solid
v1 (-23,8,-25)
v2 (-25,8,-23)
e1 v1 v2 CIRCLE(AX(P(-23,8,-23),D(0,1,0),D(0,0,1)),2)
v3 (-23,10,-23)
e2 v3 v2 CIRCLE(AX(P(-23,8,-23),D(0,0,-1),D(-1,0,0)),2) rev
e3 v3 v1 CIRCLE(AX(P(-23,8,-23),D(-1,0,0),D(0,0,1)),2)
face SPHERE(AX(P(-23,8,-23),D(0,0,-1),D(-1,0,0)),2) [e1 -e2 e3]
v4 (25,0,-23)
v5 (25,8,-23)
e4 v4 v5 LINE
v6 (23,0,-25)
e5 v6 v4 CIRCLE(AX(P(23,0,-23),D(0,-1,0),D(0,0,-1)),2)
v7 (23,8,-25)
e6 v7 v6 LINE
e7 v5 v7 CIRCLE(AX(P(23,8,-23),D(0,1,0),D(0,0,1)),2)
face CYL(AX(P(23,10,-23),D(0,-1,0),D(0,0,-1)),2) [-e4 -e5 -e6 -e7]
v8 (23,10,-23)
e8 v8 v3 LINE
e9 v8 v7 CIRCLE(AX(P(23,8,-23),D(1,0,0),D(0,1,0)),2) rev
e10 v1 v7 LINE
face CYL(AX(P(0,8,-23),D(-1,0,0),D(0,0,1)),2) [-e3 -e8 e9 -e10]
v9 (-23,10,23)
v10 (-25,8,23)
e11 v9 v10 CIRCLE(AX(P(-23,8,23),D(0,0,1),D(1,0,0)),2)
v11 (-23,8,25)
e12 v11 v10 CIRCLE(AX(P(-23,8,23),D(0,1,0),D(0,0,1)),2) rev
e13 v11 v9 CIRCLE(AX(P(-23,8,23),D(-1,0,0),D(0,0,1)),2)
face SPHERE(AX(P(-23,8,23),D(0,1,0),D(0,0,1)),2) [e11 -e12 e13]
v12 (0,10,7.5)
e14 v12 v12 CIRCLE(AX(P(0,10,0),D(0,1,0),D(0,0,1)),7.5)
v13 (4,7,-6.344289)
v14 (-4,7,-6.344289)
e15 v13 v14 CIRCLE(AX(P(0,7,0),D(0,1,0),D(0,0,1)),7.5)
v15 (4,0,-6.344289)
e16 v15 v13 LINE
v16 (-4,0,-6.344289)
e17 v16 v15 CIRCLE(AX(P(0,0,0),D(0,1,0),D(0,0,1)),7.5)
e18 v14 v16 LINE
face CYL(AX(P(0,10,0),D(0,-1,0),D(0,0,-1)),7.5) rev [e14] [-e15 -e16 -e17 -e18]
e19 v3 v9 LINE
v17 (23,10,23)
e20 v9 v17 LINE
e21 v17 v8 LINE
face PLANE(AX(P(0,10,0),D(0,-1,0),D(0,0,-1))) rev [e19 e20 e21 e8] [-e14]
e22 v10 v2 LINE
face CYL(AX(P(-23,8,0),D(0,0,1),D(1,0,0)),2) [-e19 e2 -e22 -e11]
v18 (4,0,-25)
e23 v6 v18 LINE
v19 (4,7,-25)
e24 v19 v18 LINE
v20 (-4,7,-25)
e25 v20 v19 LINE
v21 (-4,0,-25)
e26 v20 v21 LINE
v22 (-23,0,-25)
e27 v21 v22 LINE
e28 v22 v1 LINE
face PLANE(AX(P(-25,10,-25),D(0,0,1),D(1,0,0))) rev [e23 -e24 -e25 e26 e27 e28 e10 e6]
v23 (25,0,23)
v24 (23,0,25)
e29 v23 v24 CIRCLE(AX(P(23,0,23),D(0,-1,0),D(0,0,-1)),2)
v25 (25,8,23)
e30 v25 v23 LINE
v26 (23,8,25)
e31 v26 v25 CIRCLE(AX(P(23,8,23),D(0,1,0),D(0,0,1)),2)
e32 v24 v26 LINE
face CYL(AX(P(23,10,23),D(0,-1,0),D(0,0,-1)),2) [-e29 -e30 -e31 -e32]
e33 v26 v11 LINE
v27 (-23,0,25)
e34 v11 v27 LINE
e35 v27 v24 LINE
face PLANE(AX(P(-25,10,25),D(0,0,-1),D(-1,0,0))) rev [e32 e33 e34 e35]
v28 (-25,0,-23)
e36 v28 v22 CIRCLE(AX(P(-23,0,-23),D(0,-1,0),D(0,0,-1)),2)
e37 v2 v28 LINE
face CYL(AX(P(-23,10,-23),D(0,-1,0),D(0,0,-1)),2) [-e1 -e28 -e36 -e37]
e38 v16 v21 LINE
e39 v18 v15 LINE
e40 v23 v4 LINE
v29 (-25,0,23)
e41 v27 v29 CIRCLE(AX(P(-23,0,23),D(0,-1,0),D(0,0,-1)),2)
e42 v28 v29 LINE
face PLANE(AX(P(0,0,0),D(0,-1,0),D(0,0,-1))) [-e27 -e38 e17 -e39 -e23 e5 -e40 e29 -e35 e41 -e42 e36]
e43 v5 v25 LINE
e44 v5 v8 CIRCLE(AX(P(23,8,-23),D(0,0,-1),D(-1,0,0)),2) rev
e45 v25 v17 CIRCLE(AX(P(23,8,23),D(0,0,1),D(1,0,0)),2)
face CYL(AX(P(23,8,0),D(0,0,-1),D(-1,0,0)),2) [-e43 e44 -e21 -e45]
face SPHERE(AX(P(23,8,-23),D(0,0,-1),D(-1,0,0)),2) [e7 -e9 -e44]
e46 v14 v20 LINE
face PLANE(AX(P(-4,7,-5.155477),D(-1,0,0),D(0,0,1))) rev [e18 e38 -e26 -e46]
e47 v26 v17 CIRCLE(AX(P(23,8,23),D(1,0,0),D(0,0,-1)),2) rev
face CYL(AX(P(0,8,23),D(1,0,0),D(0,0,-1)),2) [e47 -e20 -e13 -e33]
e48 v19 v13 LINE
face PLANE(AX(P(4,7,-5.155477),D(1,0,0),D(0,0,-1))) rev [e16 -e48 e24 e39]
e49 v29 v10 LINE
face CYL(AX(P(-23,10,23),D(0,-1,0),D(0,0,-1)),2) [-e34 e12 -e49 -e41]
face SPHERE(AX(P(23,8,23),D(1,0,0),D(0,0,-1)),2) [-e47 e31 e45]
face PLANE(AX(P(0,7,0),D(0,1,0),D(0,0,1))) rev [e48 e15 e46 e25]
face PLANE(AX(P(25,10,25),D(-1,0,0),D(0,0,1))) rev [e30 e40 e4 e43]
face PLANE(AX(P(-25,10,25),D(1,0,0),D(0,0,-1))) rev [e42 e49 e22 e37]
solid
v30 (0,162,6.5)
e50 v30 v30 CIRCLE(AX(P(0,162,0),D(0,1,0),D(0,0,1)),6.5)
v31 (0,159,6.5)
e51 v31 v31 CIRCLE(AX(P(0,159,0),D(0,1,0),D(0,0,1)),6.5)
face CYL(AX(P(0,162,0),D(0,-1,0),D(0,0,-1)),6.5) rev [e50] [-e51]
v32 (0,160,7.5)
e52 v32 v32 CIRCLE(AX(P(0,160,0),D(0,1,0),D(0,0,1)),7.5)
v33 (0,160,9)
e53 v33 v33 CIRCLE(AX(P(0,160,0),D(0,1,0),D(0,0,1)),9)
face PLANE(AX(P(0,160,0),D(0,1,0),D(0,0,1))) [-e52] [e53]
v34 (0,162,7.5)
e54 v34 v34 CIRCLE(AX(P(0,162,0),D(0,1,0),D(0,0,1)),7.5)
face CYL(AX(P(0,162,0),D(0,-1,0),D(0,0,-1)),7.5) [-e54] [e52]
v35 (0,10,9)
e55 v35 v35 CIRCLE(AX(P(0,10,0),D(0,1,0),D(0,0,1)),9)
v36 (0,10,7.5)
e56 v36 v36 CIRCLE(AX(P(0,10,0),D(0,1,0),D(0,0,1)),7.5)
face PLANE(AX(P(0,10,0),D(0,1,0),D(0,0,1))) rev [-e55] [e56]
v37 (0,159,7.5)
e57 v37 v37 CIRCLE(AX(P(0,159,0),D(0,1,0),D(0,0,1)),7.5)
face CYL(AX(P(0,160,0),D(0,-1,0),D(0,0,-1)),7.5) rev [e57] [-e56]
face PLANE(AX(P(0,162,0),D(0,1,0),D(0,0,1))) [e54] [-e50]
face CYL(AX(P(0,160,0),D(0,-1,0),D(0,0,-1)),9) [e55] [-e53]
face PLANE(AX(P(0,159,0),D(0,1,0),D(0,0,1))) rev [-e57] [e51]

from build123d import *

# Parameters (mm, degrees)
SKETCH_220_W        = 50
SKETCH_220_H        = 50
SKETCH_220_R        = 7.5
EXTRUDE_1_DEPTH     = 10
FILLET_2_R          = 2
SKETCH_983_R        = 9
EXTRUDE_2_DEPTH     = 150
SHELL_6_T           = -1.5
SKETCH_6_R          = 7.5
EXTRUDE_5_DEPTH     = 3
SHELL_START         = 159
SHELL_13_OUTLINE_R  = 6.5
SHELL_13_DEPTH      = 3
SKETCH_9_W          = 8
SKETCH_9_H          = 19.844522728
CUT_EXTRUDE_1_DEPTH = 7


# Read off the part's stored shape, not the designer's step: 抽壳13
with BuildPart() as part:
    # Sketch 220 → 凸台-拉伸1 (new body)
    with BuildSketch(Plane(origin=(0, 0, 0), x_dir=(1, 0, 0), z_dir=(0, 1, 0))):
        Rectangle(SKETCH_220_W, SKETCH_220_H)
        with Locations(Location((0, 0, 0), (0, 0, 270))):
            Circle(SKETCH_220_R, mode=Mode.SUBTRACT)
    extrude(amount=EXTRUDE_1_DEPTH)

    # 圆角2
    fillet_2_edges = [part.edges().sort_by_distance(p)[0] for p in [
        (-25, 10, 0),
        (0, 10, 25),
        (25, 10, 0),
        (25, 5, 25),
        (-25, 5, 25),
        (-25, 5, -25),
        (25, 5, -25),
        (0, 10, -25),
    ]]
    fillet(fillet_2_edges, radius=FILLET_2_R)

    # 草图9 → 切除-拉伸1 (cut)
    with BuildSketch(Plane(origin=(0, 0, 0), x_dir=(-1, 0, 0), z_dir=(0, -1, 0))):
        with Locations((0, 15.077738636)):
            Rectangle(SKETCH_9_W, SKETCH_9_H)
    extrude(amount=-CUT_EXTRUDE_1_DEPTH, mode=Mode.SUBTRACT)


with BuildPart() as body_2:
    # Sketch 983 → 凸台-拉伸2 (new body)
    with BuildSketch(Plane(origin=(0, 10, 0), x_dir=(1, 0, 0), z_dir=(0, 1, 0))):
        with Locations(Location((0, 0, 0), (0, 0, 270))):
            Circle(SKETCH_983_R)
    extrude(amount=EXTRUDE_2_DEPTH)

    # 抽壳6
    shell_6_openings = [body_2.faces().sort_by_distance(p)[0] for p in [
        (0, 160, 0),
        (0, 10, 0),
    ]]
    offset(amount=SHELL_6_T, openings=shell_6_openings, kind=Kind.INTERSECTION)

    # 草图6 → 凸台-拉伸5 (add)
    with BuildSketch(Plane(origin=(0, 159, 0), x_dir=(1, 0, 0), z_dir=(0, 1, 0))):
        with Locations(Location((0, 0, 0), (0, 0, 270))):
            Circle(SKETCH_6_R)
    extrude(amount=EXTRUDE_5_DEPTH)

    # 抽壳13 outline → 抽壳13 (cut)
    with BuildSketch(Plane(origin=(0, 0, 0), x_dir=(1, 0, 0), z_dir=(0, 1, 0)).offset(SHELL_START)):
        Circle(SHELL_13_OUTLINE_R)
    extrude(amount=SHELL_13_DEPTH, mode=Mode.SUBTRACT)


solid = Compound([part.part, body_2.part])
